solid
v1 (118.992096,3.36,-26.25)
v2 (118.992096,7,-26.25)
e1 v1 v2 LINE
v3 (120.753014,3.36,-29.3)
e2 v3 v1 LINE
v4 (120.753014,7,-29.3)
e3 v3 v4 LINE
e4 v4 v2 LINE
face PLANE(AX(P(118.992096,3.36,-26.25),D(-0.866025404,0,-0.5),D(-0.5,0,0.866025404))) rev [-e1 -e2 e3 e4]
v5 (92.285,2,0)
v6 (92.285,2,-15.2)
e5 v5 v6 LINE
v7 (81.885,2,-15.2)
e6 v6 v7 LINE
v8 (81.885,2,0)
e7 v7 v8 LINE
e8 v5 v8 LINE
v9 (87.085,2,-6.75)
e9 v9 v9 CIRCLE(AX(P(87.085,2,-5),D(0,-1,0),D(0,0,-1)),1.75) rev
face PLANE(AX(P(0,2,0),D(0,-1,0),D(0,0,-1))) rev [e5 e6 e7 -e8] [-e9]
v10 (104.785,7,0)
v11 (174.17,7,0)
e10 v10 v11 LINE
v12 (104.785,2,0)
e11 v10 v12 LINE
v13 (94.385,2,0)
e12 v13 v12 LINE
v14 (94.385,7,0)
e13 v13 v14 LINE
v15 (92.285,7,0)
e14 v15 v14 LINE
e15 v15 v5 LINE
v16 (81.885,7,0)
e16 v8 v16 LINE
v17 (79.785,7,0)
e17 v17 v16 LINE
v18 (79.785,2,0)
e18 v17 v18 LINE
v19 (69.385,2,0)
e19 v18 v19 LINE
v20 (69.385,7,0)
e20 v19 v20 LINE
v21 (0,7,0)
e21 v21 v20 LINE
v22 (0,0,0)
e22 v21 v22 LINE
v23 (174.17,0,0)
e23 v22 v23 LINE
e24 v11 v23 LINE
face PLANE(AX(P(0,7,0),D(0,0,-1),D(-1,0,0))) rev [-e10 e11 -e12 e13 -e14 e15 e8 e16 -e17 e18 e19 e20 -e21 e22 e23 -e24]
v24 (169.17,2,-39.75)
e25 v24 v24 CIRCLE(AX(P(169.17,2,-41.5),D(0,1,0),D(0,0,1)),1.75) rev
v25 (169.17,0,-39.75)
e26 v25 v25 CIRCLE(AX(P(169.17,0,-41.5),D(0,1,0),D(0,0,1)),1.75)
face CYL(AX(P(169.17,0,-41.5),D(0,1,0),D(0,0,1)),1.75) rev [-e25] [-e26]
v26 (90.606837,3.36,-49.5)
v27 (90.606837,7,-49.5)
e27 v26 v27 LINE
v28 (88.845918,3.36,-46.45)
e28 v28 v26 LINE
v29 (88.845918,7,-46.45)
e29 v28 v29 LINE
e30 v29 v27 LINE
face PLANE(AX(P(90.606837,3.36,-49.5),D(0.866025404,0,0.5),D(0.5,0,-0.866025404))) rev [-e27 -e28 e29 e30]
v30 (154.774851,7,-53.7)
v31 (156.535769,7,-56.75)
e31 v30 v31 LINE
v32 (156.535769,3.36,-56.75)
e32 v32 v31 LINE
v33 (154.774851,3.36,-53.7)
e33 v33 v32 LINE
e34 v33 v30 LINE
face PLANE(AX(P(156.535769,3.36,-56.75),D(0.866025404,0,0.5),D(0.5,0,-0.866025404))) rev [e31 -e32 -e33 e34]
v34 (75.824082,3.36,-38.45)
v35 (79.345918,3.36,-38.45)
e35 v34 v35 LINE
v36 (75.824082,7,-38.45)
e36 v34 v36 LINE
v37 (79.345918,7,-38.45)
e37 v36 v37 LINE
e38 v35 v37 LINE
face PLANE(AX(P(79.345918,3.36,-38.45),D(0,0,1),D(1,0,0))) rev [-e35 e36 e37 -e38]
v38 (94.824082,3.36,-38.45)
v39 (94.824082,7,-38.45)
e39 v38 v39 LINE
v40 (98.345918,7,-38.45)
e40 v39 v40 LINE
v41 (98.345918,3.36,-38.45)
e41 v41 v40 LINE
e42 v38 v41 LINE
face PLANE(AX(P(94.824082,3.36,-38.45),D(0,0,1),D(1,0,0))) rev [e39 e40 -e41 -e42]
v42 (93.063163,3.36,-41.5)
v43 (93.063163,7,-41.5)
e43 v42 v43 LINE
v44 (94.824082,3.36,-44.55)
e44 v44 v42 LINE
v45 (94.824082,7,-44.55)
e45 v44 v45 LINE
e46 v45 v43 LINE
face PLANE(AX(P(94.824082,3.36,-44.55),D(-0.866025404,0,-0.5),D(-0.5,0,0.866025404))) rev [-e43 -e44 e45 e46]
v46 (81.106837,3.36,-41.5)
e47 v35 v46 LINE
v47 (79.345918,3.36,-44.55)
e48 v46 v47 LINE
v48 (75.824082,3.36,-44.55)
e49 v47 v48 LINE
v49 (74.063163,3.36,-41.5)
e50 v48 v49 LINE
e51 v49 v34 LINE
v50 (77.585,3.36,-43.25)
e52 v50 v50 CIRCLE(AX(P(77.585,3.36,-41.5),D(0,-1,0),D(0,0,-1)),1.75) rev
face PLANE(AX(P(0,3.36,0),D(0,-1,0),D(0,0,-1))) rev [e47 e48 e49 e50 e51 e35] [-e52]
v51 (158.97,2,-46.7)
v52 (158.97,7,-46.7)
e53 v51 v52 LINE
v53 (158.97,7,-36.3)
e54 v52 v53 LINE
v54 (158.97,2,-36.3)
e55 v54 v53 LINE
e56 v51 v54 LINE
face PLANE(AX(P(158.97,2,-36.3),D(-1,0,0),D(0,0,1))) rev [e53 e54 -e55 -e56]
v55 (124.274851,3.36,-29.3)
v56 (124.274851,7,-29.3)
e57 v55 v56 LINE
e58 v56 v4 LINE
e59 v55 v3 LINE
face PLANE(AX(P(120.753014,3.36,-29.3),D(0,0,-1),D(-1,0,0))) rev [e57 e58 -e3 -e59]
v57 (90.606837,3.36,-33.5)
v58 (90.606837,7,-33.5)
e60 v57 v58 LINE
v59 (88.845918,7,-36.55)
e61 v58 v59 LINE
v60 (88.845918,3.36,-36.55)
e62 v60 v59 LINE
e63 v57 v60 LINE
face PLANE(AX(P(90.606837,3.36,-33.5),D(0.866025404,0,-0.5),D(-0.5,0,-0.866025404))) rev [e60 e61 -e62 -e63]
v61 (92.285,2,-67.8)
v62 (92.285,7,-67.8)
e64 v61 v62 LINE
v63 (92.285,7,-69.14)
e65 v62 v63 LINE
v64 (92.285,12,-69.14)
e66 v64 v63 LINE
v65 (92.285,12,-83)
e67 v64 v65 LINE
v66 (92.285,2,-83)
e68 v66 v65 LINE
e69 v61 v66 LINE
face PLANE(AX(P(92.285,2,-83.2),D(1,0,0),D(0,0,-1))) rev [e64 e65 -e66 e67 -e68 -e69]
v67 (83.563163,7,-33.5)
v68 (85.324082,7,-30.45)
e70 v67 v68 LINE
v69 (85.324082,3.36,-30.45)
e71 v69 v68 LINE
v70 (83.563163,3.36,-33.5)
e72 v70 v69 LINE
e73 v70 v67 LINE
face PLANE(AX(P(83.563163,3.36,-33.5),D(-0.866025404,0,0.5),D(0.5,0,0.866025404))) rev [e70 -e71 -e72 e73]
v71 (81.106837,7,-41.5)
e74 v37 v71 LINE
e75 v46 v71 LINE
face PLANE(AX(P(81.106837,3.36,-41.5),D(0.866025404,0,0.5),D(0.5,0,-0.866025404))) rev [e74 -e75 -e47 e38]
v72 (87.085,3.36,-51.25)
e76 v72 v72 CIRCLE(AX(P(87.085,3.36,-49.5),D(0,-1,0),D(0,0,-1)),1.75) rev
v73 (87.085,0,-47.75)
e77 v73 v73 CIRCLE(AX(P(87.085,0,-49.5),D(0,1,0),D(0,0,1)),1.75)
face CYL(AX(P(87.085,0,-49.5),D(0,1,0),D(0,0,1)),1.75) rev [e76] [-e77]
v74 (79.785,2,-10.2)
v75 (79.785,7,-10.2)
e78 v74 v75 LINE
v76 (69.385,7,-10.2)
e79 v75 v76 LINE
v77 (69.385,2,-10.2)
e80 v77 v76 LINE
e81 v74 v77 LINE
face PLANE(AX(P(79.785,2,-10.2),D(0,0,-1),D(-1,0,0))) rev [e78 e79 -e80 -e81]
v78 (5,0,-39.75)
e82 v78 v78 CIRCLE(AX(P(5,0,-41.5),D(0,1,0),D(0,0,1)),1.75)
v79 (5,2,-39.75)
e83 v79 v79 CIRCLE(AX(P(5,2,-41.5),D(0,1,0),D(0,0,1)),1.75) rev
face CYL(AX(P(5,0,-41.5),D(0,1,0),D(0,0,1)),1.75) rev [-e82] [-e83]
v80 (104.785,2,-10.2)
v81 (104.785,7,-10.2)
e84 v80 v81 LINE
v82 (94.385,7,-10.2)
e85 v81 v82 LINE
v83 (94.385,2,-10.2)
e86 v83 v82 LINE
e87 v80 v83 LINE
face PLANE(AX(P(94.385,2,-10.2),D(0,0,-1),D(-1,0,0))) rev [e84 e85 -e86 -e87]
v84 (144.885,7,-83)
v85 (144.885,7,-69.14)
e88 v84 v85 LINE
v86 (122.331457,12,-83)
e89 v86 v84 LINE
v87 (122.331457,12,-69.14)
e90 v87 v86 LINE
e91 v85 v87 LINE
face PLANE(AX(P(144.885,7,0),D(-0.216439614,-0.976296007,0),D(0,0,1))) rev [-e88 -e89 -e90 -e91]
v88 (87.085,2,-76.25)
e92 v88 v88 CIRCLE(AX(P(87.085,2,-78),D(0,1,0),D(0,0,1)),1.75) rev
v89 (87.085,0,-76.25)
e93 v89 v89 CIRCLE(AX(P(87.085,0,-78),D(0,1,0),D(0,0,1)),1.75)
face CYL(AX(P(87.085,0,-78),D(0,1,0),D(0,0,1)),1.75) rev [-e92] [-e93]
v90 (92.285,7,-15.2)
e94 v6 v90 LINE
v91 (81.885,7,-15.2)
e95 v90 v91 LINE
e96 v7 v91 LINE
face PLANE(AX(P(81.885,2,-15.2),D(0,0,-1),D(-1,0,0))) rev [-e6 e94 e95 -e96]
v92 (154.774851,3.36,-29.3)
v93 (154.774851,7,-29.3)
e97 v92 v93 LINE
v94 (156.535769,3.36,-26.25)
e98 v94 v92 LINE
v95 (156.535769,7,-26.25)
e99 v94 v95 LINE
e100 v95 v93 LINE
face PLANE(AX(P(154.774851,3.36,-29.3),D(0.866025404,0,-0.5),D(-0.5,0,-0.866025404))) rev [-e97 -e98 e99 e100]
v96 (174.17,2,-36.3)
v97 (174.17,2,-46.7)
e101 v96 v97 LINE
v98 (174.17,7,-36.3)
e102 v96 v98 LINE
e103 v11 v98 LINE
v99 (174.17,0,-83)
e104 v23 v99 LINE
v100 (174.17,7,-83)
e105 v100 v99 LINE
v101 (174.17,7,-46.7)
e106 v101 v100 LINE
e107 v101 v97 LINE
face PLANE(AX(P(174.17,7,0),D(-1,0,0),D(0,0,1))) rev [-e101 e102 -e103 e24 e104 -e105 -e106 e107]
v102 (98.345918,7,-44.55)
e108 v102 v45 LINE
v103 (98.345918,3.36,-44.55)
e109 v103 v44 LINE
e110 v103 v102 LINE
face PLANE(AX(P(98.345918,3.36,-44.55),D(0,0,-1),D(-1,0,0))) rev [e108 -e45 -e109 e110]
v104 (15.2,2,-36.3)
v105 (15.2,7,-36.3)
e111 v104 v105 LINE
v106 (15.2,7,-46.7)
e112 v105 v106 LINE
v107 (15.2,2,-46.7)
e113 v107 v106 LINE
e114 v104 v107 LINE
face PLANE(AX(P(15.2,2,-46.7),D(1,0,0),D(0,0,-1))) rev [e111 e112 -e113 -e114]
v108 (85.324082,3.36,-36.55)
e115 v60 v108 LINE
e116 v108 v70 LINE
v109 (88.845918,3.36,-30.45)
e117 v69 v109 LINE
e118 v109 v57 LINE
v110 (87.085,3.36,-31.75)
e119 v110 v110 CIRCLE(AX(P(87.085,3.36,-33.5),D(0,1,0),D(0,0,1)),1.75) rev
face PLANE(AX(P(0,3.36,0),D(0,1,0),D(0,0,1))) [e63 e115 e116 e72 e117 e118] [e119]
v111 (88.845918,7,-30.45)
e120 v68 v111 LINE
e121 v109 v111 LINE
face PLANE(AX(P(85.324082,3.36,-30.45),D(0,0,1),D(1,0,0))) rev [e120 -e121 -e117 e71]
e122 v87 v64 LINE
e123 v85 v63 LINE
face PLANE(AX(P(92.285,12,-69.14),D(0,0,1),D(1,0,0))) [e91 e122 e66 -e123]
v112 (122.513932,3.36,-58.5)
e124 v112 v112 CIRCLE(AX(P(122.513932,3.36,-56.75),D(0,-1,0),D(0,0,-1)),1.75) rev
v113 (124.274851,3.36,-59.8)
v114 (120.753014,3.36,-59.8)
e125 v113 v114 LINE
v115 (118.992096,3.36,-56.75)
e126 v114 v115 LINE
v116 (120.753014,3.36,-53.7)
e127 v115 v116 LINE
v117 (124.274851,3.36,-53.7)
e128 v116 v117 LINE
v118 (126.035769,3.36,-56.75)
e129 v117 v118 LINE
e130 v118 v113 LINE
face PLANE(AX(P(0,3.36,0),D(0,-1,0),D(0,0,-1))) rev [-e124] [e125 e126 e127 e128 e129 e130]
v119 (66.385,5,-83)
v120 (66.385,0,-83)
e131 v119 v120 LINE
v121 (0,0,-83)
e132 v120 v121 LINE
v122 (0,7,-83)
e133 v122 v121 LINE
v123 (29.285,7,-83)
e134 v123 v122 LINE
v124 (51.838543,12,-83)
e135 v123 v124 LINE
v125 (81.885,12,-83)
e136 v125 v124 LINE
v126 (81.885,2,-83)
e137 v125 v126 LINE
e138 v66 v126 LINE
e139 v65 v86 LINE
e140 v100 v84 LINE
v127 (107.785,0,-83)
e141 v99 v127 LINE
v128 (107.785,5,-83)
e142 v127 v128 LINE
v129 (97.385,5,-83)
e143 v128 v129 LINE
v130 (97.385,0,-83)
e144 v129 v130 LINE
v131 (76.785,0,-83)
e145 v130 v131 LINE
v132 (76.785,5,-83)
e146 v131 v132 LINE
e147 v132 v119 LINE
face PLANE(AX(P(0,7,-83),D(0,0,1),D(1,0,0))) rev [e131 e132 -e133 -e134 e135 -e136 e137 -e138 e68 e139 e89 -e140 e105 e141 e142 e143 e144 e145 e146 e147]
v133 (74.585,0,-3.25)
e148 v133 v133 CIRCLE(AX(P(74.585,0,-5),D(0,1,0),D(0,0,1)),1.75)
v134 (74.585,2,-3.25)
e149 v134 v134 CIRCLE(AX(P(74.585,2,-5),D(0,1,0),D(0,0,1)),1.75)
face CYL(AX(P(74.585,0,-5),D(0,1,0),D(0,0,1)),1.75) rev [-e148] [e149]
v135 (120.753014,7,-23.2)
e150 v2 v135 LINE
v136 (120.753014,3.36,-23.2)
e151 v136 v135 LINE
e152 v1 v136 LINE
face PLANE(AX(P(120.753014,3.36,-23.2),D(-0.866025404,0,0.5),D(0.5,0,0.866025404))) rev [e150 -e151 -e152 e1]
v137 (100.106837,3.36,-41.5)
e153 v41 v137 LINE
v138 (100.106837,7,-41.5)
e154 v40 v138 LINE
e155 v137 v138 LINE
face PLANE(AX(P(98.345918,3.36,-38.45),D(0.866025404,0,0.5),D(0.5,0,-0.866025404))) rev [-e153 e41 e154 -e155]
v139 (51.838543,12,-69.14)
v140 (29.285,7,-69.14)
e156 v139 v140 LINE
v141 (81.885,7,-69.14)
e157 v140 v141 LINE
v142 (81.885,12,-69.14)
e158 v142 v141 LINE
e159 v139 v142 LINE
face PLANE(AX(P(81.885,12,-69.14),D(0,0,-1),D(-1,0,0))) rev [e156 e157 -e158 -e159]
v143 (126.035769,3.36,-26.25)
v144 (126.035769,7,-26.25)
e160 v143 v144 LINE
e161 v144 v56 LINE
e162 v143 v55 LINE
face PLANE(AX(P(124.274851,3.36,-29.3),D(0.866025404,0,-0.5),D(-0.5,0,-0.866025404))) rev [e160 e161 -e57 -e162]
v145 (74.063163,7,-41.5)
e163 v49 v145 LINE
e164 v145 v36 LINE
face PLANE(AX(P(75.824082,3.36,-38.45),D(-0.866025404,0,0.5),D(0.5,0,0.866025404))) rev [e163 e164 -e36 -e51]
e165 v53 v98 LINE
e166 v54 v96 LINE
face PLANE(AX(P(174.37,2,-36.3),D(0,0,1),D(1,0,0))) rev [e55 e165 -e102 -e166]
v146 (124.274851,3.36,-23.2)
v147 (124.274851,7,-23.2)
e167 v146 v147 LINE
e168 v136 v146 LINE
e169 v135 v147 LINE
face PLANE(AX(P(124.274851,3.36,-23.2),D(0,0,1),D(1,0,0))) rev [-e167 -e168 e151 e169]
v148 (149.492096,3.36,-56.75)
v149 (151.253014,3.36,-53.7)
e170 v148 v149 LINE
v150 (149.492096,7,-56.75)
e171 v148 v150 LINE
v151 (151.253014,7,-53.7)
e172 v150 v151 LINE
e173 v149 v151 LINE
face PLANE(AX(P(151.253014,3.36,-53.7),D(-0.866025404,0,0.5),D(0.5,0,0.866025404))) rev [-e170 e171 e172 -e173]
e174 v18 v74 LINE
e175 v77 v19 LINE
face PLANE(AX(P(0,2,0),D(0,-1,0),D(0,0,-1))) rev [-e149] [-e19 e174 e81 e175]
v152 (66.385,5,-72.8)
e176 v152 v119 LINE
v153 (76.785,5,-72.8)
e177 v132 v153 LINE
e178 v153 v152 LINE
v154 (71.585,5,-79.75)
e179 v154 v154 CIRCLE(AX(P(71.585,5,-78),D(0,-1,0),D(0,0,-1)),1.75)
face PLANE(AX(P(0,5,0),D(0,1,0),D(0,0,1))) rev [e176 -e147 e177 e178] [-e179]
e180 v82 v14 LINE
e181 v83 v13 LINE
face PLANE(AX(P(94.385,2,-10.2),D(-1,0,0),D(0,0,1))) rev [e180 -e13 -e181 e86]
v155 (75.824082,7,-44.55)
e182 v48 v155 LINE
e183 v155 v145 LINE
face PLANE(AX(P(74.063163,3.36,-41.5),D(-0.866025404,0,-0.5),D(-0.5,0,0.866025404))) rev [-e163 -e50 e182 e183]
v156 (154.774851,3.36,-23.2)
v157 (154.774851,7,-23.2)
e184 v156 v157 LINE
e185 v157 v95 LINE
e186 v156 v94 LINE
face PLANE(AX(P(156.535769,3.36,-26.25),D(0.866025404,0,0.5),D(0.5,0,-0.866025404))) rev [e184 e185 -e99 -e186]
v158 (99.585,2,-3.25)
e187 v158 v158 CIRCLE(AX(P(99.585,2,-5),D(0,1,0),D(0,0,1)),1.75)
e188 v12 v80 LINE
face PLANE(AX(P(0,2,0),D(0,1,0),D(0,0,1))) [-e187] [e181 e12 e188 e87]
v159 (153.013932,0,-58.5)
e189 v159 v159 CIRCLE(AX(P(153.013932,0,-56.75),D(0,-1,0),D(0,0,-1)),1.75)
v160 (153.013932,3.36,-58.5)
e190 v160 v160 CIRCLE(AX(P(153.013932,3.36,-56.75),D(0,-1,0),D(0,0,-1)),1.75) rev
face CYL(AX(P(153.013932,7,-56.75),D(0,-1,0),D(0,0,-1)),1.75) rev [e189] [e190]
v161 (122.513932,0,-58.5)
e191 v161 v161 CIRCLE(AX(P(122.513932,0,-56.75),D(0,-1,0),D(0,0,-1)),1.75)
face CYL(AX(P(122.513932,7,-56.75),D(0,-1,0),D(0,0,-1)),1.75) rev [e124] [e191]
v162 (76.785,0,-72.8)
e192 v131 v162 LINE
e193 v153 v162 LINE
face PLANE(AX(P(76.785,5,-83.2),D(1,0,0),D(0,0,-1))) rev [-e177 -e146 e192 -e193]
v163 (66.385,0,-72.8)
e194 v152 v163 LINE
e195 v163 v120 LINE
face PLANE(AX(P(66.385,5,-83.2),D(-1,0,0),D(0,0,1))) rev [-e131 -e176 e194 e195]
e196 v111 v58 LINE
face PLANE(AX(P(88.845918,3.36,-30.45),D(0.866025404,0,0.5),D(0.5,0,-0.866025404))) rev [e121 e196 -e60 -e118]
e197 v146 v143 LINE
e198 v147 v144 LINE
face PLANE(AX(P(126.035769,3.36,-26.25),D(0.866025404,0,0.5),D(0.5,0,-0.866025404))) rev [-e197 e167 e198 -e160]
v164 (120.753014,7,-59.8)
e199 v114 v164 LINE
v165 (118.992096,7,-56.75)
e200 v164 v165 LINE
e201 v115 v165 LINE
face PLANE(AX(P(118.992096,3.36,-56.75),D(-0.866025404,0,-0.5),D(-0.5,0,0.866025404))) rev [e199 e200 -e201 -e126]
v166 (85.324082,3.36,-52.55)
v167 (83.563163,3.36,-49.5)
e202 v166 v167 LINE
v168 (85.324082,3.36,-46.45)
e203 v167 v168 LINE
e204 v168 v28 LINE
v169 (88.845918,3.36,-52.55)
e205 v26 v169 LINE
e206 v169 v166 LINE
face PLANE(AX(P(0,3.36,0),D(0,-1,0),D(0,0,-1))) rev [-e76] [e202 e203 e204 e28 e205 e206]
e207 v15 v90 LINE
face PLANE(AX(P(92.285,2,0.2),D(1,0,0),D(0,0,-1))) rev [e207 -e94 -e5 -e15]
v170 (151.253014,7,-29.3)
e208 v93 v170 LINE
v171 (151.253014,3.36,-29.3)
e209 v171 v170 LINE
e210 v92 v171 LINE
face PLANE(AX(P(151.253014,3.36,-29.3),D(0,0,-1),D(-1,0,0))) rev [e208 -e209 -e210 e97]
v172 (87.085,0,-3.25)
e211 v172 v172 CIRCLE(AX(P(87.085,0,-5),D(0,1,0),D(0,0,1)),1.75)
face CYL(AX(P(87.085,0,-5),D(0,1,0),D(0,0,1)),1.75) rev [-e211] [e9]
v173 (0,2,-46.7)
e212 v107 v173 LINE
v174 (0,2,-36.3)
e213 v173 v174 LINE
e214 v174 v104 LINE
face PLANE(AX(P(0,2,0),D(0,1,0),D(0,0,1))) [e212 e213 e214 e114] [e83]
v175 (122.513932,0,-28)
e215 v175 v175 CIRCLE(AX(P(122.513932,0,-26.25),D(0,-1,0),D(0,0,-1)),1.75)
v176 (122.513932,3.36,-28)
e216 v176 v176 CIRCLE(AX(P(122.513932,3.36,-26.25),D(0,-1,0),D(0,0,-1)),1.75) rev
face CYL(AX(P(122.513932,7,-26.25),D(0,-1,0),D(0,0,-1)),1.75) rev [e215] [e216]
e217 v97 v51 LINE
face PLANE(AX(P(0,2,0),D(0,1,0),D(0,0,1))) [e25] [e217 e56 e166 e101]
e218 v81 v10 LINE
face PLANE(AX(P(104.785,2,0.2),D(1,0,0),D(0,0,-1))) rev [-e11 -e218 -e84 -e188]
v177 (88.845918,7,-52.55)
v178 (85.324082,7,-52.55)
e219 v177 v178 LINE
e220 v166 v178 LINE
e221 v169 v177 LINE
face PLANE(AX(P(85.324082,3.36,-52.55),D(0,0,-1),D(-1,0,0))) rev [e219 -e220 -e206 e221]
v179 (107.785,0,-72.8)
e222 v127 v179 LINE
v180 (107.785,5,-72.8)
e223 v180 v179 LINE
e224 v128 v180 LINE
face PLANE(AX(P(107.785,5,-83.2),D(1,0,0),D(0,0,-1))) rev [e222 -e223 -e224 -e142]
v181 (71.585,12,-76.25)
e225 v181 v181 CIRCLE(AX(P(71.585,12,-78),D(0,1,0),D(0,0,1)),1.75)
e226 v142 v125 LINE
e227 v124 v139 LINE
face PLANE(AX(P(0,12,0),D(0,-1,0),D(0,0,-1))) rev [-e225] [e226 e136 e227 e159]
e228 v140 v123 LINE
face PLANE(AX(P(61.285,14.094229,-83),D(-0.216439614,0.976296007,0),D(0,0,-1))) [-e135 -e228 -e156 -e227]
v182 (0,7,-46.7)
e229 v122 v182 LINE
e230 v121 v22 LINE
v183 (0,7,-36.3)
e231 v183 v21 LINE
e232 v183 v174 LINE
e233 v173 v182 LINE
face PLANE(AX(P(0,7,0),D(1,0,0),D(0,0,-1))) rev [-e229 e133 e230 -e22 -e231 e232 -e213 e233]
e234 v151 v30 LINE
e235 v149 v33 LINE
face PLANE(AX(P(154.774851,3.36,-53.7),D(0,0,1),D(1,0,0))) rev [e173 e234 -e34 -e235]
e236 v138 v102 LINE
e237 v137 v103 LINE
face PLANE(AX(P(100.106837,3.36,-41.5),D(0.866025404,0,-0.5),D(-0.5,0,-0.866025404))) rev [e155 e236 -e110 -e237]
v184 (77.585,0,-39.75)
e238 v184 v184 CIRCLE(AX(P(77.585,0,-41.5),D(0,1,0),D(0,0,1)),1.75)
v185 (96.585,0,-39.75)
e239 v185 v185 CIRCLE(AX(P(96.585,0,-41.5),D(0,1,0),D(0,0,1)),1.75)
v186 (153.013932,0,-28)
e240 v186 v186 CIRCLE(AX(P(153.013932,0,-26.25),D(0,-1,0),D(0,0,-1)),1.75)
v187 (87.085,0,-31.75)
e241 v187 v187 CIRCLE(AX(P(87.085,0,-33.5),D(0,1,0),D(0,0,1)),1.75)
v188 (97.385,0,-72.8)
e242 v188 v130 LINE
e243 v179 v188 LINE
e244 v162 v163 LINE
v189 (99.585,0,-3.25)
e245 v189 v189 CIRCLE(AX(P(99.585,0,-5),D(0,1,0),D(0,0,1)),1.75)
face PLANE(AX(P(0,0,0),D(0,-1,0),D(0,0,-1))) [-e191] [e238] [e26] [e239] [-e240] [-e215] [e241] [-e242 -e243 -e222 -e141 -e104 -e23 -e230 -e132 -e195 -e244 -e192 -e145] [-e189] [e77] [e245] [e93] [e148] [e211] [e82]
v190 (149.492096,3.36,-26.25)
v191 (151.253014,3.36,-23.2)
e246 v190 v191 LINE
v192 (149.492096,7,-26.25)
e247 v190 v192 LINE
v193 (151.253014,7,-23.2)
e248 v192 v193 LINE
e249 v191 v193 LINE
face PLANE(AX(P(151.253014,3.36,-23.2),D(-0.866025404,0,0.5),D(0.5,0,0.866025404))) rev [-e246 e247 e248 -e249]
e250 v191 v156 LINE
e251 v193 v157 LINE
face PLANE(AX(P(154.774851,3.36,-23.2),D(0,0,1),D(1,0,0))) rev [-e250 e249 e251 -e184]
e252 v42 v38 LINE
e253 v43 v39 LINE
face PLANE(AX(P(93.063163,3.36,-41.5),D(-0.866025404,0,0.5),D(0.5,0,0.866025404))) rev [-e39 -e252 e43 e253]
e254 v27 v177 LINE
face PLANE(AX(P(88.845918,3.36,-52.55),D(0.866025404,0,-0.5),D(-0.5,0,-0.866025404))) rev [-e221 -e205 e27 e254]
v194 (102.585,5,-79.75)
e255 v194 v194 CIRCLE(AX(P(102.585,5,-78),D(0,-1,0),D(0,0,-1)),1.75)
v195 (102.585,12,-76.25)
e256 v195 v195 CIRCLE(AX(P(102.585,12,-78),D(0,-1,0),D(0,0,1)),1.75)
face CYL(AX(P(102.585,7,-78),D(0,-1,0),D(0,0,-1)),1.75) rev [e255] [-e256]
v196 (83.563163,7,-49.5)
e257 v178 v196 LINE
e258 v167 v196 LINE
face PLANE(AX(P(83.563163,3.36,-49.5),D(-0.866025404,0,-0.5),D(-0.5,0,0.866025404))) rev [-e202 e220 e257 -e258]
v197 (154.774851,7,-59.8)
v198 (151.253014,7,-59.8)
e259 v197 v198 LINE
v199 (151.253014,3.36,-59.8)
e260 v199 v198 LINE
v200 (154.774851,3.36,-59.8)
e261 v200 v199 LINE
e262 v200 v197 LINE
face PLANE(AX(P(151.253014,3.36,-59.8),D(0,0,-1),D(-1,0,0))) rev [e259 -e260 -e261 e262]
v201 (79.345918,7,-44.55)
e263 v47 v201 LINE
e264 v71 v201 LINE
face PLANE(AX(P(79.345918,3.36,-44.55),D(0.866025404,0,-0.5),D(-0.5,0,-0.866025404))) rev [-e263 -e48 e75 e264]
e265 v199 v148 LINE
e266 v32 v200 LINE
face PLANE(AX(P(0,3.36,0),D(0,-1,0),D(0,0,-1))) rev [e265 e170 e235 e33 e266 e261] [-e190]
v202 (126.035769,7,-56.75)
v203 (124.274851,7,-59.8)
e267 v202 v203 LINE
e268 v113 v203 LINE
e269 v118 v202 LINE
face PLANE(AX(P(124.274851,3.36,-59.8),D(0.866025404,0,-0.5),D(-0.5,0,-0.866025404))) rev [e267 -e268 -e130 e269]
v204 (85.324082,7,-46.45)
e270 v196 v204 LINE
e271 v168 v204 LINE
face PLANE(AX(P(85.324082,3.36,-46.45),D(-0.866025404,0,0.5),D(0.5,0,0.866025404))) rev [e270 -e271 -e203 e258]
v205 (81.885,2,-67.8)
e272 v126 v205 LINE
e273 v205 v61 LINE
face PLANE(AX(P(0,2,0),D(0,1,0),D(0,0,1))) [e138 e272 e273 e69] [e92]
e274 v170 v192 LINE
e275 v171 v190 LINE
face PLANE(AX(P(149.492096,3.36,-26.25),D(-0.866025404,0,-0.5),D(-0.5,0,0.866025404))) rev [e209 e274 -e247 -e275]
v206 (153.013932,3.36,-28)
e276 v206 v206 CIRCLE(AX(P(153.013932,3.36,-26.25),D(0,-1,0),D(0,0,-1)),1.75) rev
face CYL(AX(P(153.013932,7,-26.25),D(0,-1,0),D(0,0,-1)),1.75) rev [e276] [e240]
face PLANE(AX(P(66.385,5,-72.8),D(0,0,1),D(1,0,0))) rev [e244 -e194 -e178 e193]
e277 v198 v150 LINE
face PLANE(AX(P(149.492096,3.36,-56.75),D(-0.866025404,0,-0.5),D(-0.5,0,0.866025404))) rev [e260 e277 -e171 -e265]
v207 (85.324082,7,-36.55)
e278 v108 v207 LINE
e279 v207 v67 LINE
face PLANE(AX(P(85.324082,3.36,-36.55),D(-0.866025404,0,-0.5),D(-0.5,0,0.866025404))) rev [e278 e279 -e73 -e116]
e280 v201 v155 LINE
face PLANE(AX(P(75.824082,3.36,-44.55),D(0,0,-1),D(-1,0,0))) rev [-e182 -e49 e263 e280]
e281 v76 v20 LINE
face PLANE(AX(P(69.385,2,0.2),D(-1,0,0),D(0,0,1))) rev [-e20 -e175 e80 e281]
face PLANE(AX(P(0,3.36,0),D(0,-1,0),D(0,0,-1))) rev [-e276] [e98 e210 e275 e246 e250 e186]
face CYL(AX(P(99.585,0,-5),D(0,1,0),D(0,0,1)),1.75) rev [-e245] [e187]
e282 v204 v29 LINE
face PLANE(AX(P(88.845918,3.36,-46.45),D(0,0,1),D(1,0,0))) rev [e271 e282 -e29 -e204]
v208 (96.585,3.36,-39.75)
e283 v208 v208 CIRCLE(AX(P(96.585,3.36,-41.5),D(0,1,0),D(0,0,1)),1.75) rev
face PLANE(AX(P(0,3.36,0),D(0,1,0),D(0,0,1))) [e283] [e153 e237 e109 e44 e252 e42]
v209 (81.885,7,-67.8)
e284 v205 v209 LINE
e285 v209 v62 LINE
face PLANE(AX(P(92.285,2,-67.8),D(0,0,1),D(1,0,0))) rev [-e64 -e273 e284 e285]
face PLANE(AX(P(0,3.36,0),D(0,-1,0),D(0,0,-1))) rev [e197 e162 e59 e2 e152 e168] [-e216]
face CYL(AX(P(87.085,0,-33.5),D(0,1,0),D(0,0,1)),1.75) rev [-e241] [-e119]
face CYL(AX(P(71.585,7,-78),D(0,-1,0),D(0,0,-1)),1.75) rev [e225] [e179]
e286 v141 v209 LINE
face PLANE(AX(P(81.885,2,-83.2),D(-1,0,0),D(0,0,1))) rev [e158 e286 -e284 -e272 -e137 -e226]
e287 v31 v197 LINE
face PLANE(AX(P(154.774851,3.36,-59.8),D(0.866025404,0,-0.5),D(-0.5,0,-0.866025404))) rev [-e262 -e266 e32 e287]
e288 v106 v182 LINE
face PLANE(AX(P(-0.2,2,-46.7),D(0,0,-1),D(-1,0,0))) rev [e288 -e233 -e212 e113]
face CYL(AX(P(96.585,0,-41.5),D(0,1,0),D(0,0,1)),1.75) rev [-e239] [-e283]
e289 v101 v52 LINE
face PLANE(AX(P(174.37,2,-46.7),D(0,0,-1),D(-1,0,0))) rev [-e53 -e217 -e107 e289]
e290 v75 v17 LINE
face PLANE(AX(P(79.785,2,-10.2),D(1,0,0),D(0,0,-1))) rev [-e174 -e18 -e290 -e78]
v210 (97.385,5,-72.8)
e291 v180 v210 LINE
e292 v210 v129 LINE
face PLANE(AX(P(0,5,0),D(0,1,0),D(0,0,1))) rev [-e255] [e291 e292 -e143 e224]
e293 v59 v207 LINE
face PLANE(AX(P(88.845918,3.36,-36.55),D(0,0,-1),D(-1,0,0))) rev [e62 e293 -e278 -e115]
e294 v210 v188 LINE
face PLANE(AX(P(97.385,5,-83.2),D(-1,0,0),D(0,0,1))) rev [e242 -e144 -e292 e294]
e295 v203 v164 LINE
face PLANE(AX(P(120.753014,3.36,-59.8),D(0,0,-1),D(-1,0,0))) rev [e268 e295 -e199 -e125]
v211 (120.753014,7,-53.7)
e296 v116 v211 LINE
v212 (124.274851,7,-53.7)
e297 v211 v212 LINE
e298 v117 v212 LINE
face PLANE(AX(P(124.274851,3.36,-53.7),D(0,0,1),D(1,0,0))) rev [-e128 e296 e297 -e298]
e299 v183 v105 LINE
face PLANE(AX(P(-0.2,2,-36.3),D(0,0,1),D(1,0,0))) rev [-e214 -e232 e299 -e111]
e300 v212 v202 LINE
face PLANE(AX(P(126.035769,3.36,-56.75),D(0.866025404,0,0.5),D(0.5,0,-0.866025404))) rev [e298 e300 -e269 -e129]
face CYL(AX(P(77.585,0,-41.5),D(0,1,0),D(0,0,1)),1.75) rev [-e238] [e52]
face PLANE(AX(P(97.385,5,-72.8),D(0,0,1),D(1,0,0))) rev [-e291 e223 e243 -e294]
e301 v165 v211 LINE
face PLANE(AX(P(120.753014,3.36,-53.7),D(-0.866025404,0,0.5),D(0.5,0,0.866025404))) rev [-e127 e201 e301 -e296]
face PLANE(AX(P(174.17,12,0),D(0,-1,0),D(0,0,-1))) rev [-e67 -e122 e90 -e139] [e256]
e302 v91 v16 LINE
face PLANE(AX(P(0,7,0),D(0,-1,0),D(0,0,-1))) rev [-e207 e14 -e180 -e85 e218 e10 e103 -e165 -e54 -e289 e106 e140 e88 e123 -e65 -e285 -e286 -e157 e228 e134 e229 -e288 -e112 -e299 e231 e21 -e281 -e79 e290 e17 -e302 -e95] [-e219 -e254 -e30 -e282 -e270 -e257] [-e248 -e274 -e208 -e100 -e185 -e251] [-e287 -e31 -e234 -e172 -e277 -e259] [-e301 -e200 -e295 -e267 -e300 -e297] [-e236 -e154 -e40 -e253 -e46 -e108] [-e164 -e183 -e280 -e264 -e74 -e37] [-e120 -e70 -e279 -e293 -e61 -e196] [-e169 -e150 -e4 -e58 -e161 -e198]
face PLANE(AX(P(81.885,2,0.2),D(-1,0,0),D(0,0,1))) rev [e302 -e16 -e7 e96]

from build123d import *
from build123d.topology import SkipClean

# Parameters (mm, degrees)
SKETCH1_W           = 174.17
SKETCH1_H           = 83
BOSS_EXTRUDE1_DEPTH = 7
SKETCH2_R           = 1.75
CUT_EXTRUDE1_DEPTH  = 194.062655374
SKETCH3_R           = 1.75
CUT_EXTRUDE2_DEPTH  = 194.062655374
SKETCH4_W           = 15.4
SKETCH4_H           = 10.4
SKETCH4_W_2         = 10.4
SKETCH4_H_2         = 15.4
CUT_EXTRUDE3_DEPTH  = 5
SKETCH5_W           = 10.4
SKETCH5_H           = 10.4
CUT_EXTRUDE4_DEPTH  = 5
SKETCH6_R           = 1.75
CUT_EXTRUDE5_DEPTH  = 194.000489378
SKETCH12_R          = 1.75
CUT_EXTRUDE9_DEPTH  = 194.062655374
CUT_EXTRUDE6_DEPTH  = 3.64
SKETCH9_W           = 10.4
SKETCH9_H           = 10.4
CUT_EXTRUDE7_DEPTH  = 5
SKETCH10_R          = 1.75
CUT_EXTRUDE8_DEPTH  = 194.000489378
SKETCH13_W          = 20.6
SKETCH13_H          = 13.86
SKETCH13_R          = 1.75
BOSS_EXTRUDE2_DEPTH = 5
CHAMFER1_SIZE       = 7.094229205
CHAMFER1_SIZE_2     = 32
MIRROR1_START       = -76.250259333
MIRROR1_DEPTH       = 7.110259333
MIRROR1_START_2     = -83
MIRROR1_2_DEPTH     = 3.2499999
MIRROR1_START_3     = -79.7500001
MIRROR1_3_DEPTH     = 3.499740767
MIRROR1_START_4     = 7
MIRROR1_4_OUTLINE_R = 1.75
MIRROR1_4_DEPTH     = 5


with BuildPart() as part:
    # Sketch1 → Boss-Extrude1 (new body)
    with BuildSketch(Plane(origin=(0, 0, 0), x_dir=(1, 0, 0), z_dir=(0, 1, 0))):
        with Locations((87.085, 41.5)):
            Rectangle(SKETCH1_W, SKETCH1_H)
    extrude(amount=BOSS_EXTRUDE1_DEPTH)

    # Sketch2 → Cut-Extrude1 (cut, through all)
    with BuildSketch(Plane(origin=(0, 7, 0), x_dir=(1, 0, 0), z_dir=(0, 1, 0))):
        with Locations(Location((87.085, 49.5, 0), (0, 0, 270))):
            Circle(SKETCH2_R)
        with Locations(Location((77.585, 41.5, 0), (0, 0, 270))):
            Circle(SKETCH2_R)
        with Locations(Location((96.585, 41.5, 0), (0, 0, 270))):
            Circle(SKETCH2_R)
        with Locations(Location((87.085, 33.5, 0), (0, 0, 270))):
            Circle(SKETCH2_R)
    extrude(amount=-CUT_EXTRUDE1_DEPTH, mode=Mode.SUBTRACT)

    # Sketch3 → Cut-Extrude2 (cut, through all)
    with BuildSketch(Plane(origin=(0, 7, 0), x_dir=(1, 0, 0), z_dir=(0, 1, 0))):
        with Locations(Location((87.085, 78, 0), (0, 0, 270))):
            Circle(SKETCH3_R)
        with Locations(Location((5, 41.5, 0), (0, 0, 270))):
            Circle(SKETCH3_R)
        with Locations(Location((87.085, 5, 0), (0, 0, 270))):
            Circle(SKETCH3_R)
        with Locations(Location((169.17, 41.5, 0), (0, 0, 270))):
            Circle(SKETCH3_R)
    extrude(amount=-CUT_EXTRUDE2_DEPTH, mode=Mode.SUBTRACT)

    # Sketch4 → Cut-Extrude3 (cut)
    with BuildSketch(Plane(origin=(0, 7, 0), x_dir=(1, 0, 0), z_dir=(0, 1, 0))):
        with Locations((7.5, 41.5)):
            Rectangle(SKETCH4_W, SKETCH4_H)
        with Locations((87.085, 7.5)):
            Rectangle(SKETCH4_W_2, SKETCH4_H_2)
        with Locations((87.085, 75.5)):
            Rectangle(SKETCH4_W_2, SKETCH4_H_2)
        with Locations((166.67, 41.5)):
            Rectangle(SKETCH4_W, SKETCH4_H)
    extrude(amount=-CUT_EXTRUDE3_DEPTH, mode=Mode.SUBTRACT)

    # Sketch5 → Cut-Extrude4 (cut)
    with BuildSketch(Plane(origin=(0, 7, 0), x_dir=(1, 0, 0), z_dir=(0, 1, 0))):
        with Locations((74.585, 5)):
            Rectangle(SKETCH5_W, SKETCH5_H)
        with Locations((99.585, 5)):
            Rectangle(SKETCH5_W, SKETCH5_H)
    extrude(amount=-CUT_EXTRUDE4_DEPTH, mode=Mode.SUBTRACT)

    # Sketch6 → Cut-Extrude5 (cut, through all)
    with BuildSketch(Plane(origin=(0, 2, 0), x_dir=(1, 0, 0), z_dir=(0, 1, 0))):
        with Locations(Location((74.585, 5, 0), (0, 0, 270))):
            Circle(SKETCH6_R)
        with Locations(Location((99.585, 5, 0), (0, 0, 270))):
            Circle(SKETCH6_R)
    extrude(amount=-CUT_EXTRUDE5_DEPTH, mode=Mode.SUBTRACT)

    # Sketch12 → Cut-Extrude9 (cut, through all)
    with BuildSketch(Plane.XZ):
        with Locations(Location((122.51393219, -26.25, 0), (0, 0, 270))):
            Circle(SKETCH12_R)
        with Locations(Location((153.01393219, -26.25, 0), (0, 0, 270))):
            Circle(SKETCH12_R)
        with Locations(Location((122.51393219, -56.75, 0), (0, 0, 270))):
            Circle(SKETCH12_R)
        with Locations(Location((153.01393219, -56.75, 0), (0, 0, 270))):
            Circle(SKETCH12_R)
    extrude(amount=-CUT_EXTRUDE9_DEPTH, mode=Mode.SUBTRACT)

    # Sketch7 → Cut-Extrude6 (cut)
    with BuildSketch(Plane(origin=(0, 7, 0), x_dir=(1, 0, 0), z_dir=(0, 1, 0))):
        Polygon((75.824081679, 44.55), (79.345918321, 44.55), (81.106836642, 41.5), (79.345918321, 38.45), (75.824081679, 38.45), (74.063163358, 41.5), align=None)
        Polygon((85.324081679, 52.55), (88.845918321, 52.55), (90.606836642, 49.5), (88.845918321, 46.45), (85.324081679, 46.45), (83.563163358, 49.5), align=None)
        Polygon((100.106836642, 41.5), (98.345918321, 44.55), (94.824081679, 44.55), (93.063163358, 41.5), (94.824081679, 38.45), (98.345918321, 38.45), align=None)
        Polygon((83.563163358, 33.5), (85.324081679, 30.45), (88.845918321, 30.45), (90.606836642, 33.5), (88.845918321, 36.55), (85.324081679, 36.55), align=None)
        Polygon((120.753013869, 29.3), (124.274850511, 29.3), (126.035768832, 26.25), (124.274850511, 23.2), (120.753013869, 23.2), (118.992095548, 26.25), align=None)
        Polygon((151.253013869, 29.3), (154.774850511, 29.3), (156.535768832, 26.25), (154.774850511, 23.2), (151.253013869, 23.2), (149.492095548, 26.25), align=None)
        Polygon((151.253013869, 59.8), (154.774850511, 59.8), (156.535768832, 56.75), (154.774850511, 53.7), (151.253013869, 53.7), (149.492095548, 56.75), align=None)
        Polygon((120.753013869, 59.8), (124.274850511, 59.8), (126.035768832, 56.75), (124.274850511, 53.7), (120.753013869, 53.7), (118.992095548, 56.75), align=None)
    extrude(amount=-CUT_EXTRUDE6_DEPTH, mode=Mode.SUBTRACT)

    # Sketch9 → Cut-Extrude7 (cut)
    with BuildSketch(Plane.XZ):
        with Locations((71.585, -78)):
            Rectangle(SKETCH9_W, SKETCH9_H)
        with Locations((102.585, -78)):
            Rectangle(SKETCH9_W, SKETCH9_H)
    extrude(amount=-CUT_EXTRUDE7_DEPTH, mode=Mode.SUBTRACT)

    # Sketch10 → Cut-Extrude8 (cut, through all)
    with BuildSketch(Plane.XZ.offset(-5)):
        with Locations(Location((71.585, -78, 0), (0, 0, 270))):
            Circle(SKETCH10_R)
        with Locations(Location((102.585, -78, 0), (0, 0, 270))):
            Circle(SKETCH10_R)
    extrude(amount=-CUT_EXTRUDE8_DEPTH, mode=Mode.SUBTRACT)

    # Sketch13 → Boss-Extrude2 (add)
    with BuildSketch(Plane(origin=(0, 7, 0), x_dir=(1, 0, 0), z_dir=(0, 1, 0))):
        with Locations((71.585, 76.07)):
            Rectangle(SKETCH13_W, SKETCH13_H)
        with Locations(Location((71.585, 78, 0), (0, 0, 90))):
            Circle(SKETCH13_R, mode=Mode.SUBTRACT)
    extrude(amount=BOSS_EXTRUDE2_DEPTH)

    # Chamfer1
    # the kernel refuses this chamfer: 32, 7.094229205 mm, written as the material it adds along each edge
    with BuildSketch(Plane(origin=(61.285, 7, -83), x_dir=(0, 1, 0), z_dir=(0, 0, 1))) as chamfer1_piece_1_section:
        Polygon((CHAMFER1_SIZE, 0), (0, CHAMFER1_SIZE_2), (0, 0), align=None)
    chamfer1_piece_1 = extrude(amount=13.86, mode=Mode.PRIVATE)
    chamfer1_piece_1 = split(chamfer1_piece_1, bisect_by=Plane(origin=(61.285, 12, -83), z_dir=(0, -1, 0)), keep=Keep.TOP, mode=Mode.PRIVATE)
    add(chamfer1_piece_1)

    # Mirror1: read off the stored shape, not the designer's step
    # Mirror1 outline → Mirror1 (add)
    with BuildSketch(Plane.XY.offset(MIRROR1_START)):
        Polygon((92.285, 12), (92.285, 7), (144.885, 7), (122.331457482, 12), align=None)
    extrude(amount=MIRROR1_DEPTH)

    # Mirror1 2 outline → Mirror1 2 (add)
    with BuildSketch(Plane.XY.offset(MIRROR1_START_2)):
        Polygon((92.285, 12), (92.285, 7), (144.885, 7), (122.331457482, 12), align=None)
    extrude(amount=MIRROR1_2_DEPTH)

    # Mirror1 3 outline → Mirror1 3 (add)
    with BuildSketch(Plane.XY.offset(MIRROR1_START_3)):
        Polygon((92.285, 12), (92.285, 7), (144.885, 7), (122.331457482, 12), align=None)
    extrude(amount=MIRROR1_3_DEPTH)

    # Mirror1 4 outline → Mirror1 4 (cut)
    with SkipClean():  # the faces are left unmerged after this step: merging them gives an invalid solid
        with BuildSketch(Plane(origin=(0, 0, 0), x_dir=(1, 0, 0), z_dir=(0, 1, 0)).offset(MIRROR1_START_4)):
            with Locations((102.585, 78)):
                Circle(MIRROR1_4_OUTLINE_R)
        extrude(amount=MIRROR1_4_DEPTH, mode=Mode.SUBTRACT)
    add(part.part.scale(1), mode=Mode.REPLACE)  # the faces are merged on a copy


solid = part.part
